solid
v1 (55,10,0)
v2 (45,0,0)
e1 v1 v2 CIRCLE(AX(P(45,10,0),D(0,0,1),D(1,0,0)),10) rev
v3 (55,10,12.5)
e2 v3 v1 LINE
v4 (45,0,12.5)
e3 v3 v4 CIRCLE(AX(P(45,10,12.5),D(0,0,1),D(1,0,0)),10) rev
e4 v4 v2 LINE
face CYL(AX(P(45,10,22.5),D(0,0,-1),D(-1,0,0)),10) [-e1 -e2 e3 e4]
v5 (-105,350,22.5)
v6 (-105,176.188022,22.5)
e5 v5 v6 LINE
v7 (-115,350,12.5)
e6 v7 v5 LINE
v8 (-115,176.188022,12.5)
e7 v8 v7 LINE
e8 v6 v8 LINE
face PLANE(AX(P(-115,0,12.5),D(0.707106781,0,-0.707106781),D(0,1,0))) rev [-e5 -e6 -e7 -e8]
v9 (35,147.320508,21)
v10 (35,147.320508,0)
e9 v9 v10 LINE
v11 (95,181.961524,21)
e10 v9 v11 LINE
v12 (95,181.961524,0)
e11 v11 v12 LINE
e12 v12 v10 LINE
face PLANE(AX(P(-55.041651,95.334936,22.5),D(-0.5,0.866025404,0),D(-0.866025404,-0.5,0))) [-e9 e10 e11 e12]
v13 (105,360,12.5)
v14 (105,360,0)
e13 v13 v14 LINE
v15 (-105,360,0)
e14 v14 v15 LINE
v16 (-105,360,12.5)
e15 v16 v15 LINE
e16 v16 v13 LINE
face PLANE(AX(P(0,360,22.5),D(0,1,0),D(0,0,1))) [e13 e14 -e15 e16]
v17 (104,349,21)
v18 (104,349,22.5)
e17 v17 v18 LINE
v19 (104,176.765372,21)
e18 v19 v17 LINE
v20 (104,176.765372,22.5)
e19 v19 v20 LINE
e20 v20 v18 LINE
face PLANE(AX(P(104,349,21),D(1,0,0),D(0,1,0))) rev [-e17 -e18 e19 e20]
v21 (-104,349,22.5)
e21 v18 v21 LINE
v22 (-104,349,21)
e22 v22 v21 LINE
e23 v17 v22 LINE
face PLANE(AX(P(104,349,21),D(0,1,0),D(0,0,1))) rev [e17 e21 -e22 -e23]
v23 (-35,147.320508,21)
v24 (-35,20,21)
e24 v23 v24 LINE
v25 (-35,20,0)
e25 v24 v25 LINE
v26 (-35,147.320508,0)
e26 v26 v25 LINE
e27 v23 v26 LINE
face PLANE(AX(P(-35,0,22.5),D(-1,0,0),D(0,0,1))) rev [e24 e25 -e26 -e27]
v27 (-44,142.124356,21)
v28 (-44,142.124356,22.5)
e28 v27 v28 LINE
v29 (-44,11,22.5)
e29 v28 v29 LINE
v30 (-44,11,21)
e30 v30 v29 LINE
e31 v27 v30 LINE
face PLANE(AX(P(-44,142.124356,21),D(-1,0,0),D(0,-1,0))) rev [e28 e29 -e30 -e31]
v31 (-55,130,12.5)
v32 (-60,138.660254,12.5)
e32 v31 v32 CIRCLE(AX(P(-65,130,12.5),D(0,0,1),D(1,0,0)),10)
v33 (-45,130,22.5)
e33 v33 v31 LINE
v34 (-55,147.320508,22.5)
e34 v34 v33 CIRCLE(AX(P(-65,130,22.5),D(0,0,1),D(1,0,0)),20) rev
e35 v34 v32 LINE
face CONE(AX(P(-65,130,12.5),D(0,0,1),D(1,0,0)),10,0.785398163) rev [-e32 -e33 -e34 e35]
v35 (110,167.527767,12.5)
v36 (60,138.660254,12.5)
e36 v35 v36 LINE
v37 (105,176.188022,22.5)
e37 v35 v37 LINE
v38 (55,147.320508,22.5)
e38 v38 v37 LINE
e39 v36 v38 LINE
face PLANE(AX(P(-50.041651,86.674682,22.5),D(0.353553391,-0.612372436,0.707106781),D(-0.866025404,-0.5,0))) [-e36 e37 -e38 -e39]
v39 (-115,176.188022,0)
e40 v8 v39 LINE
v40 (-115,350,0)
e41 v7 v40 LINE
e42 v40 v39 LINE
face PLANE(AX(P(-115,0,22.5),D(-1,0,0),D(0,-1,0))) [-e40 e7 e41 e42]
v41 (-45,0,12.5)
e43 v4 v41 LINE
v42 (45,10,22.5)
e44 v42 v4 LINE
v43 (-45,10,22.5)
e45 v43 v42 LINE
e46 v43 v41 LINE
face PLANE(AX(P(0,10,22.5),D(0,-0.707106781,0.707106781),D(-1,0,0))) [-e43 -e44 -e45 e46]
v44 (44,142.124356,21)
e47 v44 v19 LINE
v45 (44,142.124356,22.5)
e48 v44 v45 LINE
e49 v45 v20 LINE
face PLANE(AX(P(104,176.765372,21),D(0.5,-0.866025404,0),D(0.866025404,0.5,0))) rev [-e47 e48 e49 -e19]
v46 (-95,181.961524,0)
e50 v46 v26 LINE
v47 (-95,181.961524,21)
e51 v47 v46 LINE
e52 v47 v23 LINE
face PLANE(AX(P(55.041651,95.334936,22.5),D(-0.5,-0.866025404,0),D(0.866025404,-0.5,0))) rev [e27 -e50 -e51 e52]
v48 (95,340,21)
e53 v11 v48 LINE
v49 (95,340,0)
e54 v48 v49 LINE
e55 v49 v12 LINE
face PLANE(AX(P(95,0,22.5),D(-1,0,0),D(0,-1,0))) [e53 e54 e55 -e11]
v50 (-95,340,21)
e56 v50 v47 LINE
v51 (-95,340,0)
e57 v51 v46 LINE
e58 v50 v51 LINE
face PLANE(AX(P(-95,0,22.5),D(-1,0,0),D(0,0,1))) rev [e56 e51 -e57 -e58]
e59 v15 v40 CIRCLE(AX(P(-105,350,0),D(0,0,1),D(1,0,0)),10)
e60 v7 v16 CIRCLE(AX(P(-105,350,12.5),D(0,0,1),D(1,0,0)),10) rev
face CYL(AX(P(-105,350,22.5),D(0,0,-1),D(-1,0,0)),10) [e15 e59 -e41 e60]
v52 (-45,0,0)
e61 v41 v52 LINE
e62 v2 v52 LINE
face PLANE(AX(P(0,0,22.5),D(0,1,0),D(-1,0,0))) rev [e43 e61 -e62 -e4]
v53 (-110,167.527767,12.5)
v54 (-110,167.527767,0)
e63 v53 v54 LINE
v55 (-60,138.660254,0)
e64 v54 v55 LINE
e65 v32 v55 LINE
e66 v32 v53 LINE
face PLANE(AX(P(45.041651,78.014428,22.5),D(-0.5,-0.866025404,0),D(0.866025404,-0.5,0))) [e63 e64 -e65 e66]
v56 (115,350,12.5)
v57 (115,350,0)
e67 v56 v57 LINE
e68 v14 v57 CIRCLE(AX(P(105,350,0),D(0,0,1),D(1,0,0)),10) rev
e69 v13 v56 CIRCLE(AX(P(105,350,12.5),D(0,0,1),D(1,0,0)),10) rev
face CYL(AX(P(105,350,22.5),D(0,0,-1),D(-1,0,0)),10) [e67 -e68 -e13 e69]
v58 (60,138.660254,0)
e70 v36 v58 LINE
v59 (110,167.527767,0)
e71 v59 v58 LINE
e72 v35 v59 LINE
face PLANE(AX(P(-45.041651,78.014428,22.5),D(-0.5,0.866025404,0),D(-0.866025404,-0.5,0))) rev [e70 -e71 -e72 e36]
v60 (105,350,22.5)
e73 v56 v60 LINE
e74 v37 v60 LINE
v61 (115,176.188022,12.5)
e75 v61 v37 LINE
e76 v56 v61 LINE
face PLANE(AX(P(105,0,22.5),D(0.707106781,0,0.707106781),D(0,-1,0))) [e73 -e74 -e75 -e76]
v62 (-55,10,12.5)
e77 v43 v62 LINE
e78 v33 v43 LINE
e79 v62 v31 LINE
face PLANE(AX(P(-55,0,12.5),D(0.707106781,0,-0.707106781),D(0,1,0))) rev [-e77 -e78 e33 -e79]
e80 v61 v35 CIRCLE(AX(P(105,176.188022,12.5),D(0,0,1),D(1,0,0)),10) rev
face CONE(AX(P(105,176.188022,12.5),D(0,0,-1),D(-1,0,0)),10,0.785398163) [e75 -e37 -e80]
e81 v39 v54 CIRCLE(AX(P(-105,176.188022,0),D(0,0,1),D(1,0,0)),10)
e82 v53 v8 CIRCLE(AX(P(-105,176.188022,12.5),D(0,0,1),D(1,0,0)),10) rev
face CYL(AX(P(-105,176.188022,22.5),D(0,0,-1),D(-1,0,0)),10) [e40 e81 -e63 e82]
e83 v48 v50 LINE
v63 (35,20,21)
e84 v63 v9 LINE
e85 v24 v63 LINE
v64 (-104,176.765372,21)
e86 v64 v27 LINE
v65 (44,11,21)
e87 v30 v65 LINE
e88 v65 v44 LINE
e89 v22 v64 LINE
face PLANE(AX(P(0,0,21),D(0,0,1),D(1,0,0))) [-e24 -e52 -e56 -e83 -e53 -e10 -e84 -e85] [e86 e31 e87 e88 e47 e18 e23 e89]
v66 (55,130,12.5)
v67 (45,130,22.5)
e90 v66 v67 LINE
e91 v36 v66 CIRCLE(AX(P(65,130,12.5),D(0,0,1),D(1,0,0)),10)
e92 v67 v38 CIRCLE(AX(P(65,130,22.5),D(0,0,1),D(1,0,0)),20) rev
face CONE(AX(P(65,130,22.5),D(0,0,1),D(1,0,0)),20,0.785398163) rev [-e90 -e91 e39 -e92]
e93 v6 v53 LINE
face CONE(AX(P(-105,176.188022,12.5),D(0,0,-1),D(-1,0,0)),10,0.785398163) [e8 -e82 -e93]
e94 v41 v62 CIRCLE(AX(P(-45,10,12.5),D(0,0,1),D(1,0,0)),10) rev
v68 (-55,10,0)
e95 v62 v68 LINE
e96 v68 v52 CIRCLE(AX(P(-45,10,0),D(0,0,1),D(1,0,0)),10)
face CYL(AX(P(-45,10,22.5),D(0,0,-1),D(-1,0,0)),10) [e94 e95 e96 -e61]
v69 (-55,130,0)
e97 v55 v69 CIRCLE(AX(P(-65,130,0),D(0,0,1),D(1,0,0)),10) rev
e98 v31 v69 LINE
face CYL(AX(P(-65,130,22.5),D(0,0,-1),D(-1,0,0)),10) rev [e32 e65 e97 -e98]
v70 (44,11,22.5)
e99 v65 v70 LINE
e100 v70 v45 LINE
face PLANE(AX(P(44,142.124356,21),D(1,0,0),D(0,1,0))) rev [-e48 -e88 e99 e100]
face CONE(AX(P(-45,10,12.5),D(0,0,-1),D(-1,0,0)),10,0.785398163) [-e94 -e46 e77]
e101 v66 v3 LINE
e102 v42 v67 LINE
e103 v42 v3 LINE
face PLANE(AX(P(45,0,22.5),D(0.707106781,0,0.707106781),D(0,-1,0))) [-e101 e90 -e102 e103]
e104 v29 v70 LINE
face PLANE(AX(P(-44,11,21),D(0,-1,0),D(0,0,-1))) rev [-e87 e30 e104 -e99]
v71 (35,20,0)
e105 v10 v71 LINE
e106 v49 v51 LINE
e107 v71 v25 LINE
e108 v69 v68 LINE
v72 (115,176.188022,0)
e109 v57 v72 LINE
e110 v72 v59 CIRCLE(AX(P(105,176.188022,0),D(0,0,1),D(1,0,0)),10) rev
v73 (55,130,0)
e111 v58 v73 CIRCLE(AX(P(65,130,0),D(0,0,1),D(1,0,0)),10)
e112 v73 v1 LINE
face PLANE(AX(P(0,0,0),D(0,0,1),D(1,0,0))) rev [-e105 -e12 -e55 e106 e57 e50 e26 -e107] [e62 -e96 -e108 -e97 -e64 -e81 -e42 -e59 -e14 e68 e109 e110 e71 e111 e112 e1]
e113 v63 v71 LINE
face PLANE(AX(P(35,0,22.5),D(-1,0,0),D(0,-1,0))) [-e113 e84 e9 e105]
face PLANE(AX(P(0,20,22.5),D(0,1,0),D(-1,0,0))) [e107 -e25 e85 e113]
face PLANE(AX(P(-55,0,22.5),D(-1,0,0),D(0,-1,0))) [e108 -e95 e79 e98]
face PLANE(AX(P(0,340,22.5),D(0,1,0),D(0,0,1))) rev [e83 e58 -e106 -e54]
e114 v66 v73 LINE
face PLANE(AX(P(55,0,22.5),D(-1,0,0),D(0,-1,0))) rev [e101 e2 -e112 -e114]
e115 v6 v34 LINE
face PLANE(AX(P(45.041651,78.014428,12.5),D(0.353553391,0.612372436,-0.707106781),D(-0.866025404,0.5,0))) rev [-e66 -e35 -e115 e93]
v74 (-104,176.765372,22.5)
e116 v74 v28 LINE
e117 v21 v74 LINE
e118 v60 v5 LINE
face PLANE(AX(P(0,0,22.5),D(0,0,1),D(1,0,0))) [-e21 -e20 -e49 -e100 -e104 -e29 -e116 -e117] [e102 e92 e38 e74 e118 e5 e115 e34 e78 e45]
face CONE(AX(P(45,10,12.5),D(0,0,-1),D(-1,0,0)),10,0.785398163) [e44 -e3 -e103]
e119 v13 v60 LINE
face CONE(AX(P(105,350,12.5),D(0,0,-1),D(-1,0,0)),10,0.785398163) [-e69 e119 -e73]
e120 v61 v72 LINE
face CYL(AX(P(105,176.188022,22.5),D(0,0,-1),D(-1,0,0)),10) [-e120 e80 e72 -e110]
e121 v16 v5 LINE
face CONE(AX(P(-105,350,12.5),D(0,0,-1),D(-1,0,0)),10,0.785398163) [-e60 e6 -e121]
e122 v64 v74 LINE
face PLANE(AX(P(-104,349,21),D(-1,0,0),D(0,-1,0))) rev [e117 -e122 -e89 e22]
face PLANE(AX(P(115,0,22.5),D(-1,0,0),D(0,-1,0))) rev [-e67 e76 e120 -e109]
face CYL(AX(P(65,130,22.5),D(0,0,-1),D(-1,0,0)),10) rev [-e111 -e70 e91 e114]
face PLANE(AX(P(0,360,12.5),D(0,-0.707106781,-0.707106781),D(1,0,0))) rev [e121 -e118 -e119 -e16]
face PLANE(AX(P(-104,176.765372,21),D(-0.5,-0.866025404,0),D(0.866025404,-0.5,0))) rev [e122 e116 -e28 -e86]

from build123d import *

# Parameters (mm, degrees)
RESSALTO_EXTRUS_O1_DEPTH = 22.5
CHANFRO1_SIZE            = 10
CORTE_EXTRUS_O1_REACH    = 380.591
ESBO_O3_W                = 1139.230904301
ESBO_O3_H                = 709.798033895
CORTE_EXTRUS_O5_DEPTH    = 1.5


with BuildPart() as part:
    # Esboço1 → Ressalto-extrusão1 (new, symmetric)
    with BuildSketch(Plane.XY):
        with BuildLine():
            Line((-45, 0), (45, 0))
            ThreePointArc((45, 0), (52.071067812, 2.928932188), (55, 10))
            Line((55, 10), (55, 130))
            ThreePointArc((55, 130), (56.339745962, 135), (60, 138.660254038))
            Line((60, 138.660254038), (110, 167.527767497))
            ThreePointArc((110, 167.527767497), (113.660254038, 171.188021535), (115, 176.188021535))
            Line((115, 176.188021535), (115, 350))
            ThreePointArc((115, 350), (112.071067812, 357.071067812), (105, 360))
            Line((105, 360), (-105, 360))
            ThreePointArc((-105, 360), (-112.071067812, 357.071067812), (-115, 350))
            Line((-115, 350), (-115, 176.188021535))
            ThreePointArc((-115, 176.188021535), (-113.660254038, 171.188021535), (-110, 167.527767497))
            Line((-110, 167.527767497), (-60, 138.660254038))
            ThreePointArc((-60, 138.660254038), (-56.339745962, 135), (-55, 130))
            Line((-55, 130), (-55, 10))
            ThreePointArc((-55, 10), (-52.071067812, 2.928932188), (-45, 0))
        make_face()
        Polygon((-35, 20), (35, 20), (35, 147.320508076), (95, 181.961524227), (95, 340), (-95, 340), (-95, 181.961524227), (-35, 147.320508076), align=None, mode=Mode.SUBTRACT)
    extrude(amount=RESSALTO_EXTRUS_O1_DEPTH, both=True)

    # Chanfro1
    chanfro1_edges = [part.edges().sort_by_distance(p)[0] for p in [
        (113.660254038, 171.188021535, 22.5),
        (115, 263.094010768, 22.5),
        (115, 263.094010768, -22.5),
        (113.660254038, 171.188021535, -22.5),
        (85, 153.094010768, -22.5),
        (56.339745962, 135, -22.5),
        (55, 70, -22.5),
        (52.071067812, 2.928932188, -22.5),
        (0, 0, -22.5),
        (-52.071067812, 2.928932188, -22.5),
        (-55, 70, -22.5),
        (-56.339745962, 135, -22.5),
        (-85, 153.094010768, -22.5),
        (-113.660254038, 171.188021535, -22.5),
        (-115, 263.094010768, -22.5),
        (-112.071067812, 357.071067812, -22.5),
        (0, 360, -22.5),
        (112.071067812, 357.071067812, -22.5),
        (112.071067812, 357.071067812, 22.5),
        (0, 360, 22.5),
        (-112.071067812, 357.071067812, 22.5),
        (-115, 263.094010768, 22.5),
        (-113.660254038, 171.188021535, 22.5),
        (-85, 153.094010768, 22.5),
        (-56.339745962, 135, 22.5),
        (-55, 70, 22.5),
        (-52.071067812, 2.928932188, 22.5),
        (0, 0, 22.5),
        (52.071067812, 2.928932188, 22.5),
        (55, 70, 22.5),
        (56.339745962, 135, 22.5),
        (85, 153.094010768, 22.5),
    ]]
    chamfer(chanfro1_edges, length=CHANFRO1_SIZE - 0.0001)  # a hair under: the kernel refuses the full size

    # Esboço3 → Corte-extrusão1 (cut, up to next)
    with BuildSketch(Plane.XY, mode=Mode.PRIVATE) as corte_extrus_o1_sk1:
        with Locations((-153.157436203, 152.53565808)):
            Rectangle(ESBO_O3_W, ESBO_O3_H)
    corte_extrus_o1_tool1 = extrude(corte_extrus_o1_sk1.sketch, amount=-CORTE_EXTRUS_O1_REACH, mode=Mode.PRIVATE) & part.part
    add(corte_extrus_o1_tool1.solids().sort_by_distance((-153.157436, 152.535658, 0))[0], mode=Mode.SUBTRACT)

    # Esboço4 → Corte-extrusão5 (cut)
    with BuildSketch(Plane.XY.offset(22.5)):
        Polygon((104, 349), (-104, 349), (-104, 176.765371804), (-44, 142.124355653), (-44, 11), (44, 11), (44, 142.124355653), (104, 176.765371804), align=None)
        Polygon((-95, 340), (-95, 181.961524227), (-35, 147.320508076), (-35, 20), (0, 20), (35, 20), (35, 147.320508076), (95, 181.961524227), (95, 340), align=None, mode=Mode.SUBTRACT)
    extrude(amount=-CORTE_EXTRUS_O5_DEPTH, mode=Mode.SUBTRACT)


solid = part.part
